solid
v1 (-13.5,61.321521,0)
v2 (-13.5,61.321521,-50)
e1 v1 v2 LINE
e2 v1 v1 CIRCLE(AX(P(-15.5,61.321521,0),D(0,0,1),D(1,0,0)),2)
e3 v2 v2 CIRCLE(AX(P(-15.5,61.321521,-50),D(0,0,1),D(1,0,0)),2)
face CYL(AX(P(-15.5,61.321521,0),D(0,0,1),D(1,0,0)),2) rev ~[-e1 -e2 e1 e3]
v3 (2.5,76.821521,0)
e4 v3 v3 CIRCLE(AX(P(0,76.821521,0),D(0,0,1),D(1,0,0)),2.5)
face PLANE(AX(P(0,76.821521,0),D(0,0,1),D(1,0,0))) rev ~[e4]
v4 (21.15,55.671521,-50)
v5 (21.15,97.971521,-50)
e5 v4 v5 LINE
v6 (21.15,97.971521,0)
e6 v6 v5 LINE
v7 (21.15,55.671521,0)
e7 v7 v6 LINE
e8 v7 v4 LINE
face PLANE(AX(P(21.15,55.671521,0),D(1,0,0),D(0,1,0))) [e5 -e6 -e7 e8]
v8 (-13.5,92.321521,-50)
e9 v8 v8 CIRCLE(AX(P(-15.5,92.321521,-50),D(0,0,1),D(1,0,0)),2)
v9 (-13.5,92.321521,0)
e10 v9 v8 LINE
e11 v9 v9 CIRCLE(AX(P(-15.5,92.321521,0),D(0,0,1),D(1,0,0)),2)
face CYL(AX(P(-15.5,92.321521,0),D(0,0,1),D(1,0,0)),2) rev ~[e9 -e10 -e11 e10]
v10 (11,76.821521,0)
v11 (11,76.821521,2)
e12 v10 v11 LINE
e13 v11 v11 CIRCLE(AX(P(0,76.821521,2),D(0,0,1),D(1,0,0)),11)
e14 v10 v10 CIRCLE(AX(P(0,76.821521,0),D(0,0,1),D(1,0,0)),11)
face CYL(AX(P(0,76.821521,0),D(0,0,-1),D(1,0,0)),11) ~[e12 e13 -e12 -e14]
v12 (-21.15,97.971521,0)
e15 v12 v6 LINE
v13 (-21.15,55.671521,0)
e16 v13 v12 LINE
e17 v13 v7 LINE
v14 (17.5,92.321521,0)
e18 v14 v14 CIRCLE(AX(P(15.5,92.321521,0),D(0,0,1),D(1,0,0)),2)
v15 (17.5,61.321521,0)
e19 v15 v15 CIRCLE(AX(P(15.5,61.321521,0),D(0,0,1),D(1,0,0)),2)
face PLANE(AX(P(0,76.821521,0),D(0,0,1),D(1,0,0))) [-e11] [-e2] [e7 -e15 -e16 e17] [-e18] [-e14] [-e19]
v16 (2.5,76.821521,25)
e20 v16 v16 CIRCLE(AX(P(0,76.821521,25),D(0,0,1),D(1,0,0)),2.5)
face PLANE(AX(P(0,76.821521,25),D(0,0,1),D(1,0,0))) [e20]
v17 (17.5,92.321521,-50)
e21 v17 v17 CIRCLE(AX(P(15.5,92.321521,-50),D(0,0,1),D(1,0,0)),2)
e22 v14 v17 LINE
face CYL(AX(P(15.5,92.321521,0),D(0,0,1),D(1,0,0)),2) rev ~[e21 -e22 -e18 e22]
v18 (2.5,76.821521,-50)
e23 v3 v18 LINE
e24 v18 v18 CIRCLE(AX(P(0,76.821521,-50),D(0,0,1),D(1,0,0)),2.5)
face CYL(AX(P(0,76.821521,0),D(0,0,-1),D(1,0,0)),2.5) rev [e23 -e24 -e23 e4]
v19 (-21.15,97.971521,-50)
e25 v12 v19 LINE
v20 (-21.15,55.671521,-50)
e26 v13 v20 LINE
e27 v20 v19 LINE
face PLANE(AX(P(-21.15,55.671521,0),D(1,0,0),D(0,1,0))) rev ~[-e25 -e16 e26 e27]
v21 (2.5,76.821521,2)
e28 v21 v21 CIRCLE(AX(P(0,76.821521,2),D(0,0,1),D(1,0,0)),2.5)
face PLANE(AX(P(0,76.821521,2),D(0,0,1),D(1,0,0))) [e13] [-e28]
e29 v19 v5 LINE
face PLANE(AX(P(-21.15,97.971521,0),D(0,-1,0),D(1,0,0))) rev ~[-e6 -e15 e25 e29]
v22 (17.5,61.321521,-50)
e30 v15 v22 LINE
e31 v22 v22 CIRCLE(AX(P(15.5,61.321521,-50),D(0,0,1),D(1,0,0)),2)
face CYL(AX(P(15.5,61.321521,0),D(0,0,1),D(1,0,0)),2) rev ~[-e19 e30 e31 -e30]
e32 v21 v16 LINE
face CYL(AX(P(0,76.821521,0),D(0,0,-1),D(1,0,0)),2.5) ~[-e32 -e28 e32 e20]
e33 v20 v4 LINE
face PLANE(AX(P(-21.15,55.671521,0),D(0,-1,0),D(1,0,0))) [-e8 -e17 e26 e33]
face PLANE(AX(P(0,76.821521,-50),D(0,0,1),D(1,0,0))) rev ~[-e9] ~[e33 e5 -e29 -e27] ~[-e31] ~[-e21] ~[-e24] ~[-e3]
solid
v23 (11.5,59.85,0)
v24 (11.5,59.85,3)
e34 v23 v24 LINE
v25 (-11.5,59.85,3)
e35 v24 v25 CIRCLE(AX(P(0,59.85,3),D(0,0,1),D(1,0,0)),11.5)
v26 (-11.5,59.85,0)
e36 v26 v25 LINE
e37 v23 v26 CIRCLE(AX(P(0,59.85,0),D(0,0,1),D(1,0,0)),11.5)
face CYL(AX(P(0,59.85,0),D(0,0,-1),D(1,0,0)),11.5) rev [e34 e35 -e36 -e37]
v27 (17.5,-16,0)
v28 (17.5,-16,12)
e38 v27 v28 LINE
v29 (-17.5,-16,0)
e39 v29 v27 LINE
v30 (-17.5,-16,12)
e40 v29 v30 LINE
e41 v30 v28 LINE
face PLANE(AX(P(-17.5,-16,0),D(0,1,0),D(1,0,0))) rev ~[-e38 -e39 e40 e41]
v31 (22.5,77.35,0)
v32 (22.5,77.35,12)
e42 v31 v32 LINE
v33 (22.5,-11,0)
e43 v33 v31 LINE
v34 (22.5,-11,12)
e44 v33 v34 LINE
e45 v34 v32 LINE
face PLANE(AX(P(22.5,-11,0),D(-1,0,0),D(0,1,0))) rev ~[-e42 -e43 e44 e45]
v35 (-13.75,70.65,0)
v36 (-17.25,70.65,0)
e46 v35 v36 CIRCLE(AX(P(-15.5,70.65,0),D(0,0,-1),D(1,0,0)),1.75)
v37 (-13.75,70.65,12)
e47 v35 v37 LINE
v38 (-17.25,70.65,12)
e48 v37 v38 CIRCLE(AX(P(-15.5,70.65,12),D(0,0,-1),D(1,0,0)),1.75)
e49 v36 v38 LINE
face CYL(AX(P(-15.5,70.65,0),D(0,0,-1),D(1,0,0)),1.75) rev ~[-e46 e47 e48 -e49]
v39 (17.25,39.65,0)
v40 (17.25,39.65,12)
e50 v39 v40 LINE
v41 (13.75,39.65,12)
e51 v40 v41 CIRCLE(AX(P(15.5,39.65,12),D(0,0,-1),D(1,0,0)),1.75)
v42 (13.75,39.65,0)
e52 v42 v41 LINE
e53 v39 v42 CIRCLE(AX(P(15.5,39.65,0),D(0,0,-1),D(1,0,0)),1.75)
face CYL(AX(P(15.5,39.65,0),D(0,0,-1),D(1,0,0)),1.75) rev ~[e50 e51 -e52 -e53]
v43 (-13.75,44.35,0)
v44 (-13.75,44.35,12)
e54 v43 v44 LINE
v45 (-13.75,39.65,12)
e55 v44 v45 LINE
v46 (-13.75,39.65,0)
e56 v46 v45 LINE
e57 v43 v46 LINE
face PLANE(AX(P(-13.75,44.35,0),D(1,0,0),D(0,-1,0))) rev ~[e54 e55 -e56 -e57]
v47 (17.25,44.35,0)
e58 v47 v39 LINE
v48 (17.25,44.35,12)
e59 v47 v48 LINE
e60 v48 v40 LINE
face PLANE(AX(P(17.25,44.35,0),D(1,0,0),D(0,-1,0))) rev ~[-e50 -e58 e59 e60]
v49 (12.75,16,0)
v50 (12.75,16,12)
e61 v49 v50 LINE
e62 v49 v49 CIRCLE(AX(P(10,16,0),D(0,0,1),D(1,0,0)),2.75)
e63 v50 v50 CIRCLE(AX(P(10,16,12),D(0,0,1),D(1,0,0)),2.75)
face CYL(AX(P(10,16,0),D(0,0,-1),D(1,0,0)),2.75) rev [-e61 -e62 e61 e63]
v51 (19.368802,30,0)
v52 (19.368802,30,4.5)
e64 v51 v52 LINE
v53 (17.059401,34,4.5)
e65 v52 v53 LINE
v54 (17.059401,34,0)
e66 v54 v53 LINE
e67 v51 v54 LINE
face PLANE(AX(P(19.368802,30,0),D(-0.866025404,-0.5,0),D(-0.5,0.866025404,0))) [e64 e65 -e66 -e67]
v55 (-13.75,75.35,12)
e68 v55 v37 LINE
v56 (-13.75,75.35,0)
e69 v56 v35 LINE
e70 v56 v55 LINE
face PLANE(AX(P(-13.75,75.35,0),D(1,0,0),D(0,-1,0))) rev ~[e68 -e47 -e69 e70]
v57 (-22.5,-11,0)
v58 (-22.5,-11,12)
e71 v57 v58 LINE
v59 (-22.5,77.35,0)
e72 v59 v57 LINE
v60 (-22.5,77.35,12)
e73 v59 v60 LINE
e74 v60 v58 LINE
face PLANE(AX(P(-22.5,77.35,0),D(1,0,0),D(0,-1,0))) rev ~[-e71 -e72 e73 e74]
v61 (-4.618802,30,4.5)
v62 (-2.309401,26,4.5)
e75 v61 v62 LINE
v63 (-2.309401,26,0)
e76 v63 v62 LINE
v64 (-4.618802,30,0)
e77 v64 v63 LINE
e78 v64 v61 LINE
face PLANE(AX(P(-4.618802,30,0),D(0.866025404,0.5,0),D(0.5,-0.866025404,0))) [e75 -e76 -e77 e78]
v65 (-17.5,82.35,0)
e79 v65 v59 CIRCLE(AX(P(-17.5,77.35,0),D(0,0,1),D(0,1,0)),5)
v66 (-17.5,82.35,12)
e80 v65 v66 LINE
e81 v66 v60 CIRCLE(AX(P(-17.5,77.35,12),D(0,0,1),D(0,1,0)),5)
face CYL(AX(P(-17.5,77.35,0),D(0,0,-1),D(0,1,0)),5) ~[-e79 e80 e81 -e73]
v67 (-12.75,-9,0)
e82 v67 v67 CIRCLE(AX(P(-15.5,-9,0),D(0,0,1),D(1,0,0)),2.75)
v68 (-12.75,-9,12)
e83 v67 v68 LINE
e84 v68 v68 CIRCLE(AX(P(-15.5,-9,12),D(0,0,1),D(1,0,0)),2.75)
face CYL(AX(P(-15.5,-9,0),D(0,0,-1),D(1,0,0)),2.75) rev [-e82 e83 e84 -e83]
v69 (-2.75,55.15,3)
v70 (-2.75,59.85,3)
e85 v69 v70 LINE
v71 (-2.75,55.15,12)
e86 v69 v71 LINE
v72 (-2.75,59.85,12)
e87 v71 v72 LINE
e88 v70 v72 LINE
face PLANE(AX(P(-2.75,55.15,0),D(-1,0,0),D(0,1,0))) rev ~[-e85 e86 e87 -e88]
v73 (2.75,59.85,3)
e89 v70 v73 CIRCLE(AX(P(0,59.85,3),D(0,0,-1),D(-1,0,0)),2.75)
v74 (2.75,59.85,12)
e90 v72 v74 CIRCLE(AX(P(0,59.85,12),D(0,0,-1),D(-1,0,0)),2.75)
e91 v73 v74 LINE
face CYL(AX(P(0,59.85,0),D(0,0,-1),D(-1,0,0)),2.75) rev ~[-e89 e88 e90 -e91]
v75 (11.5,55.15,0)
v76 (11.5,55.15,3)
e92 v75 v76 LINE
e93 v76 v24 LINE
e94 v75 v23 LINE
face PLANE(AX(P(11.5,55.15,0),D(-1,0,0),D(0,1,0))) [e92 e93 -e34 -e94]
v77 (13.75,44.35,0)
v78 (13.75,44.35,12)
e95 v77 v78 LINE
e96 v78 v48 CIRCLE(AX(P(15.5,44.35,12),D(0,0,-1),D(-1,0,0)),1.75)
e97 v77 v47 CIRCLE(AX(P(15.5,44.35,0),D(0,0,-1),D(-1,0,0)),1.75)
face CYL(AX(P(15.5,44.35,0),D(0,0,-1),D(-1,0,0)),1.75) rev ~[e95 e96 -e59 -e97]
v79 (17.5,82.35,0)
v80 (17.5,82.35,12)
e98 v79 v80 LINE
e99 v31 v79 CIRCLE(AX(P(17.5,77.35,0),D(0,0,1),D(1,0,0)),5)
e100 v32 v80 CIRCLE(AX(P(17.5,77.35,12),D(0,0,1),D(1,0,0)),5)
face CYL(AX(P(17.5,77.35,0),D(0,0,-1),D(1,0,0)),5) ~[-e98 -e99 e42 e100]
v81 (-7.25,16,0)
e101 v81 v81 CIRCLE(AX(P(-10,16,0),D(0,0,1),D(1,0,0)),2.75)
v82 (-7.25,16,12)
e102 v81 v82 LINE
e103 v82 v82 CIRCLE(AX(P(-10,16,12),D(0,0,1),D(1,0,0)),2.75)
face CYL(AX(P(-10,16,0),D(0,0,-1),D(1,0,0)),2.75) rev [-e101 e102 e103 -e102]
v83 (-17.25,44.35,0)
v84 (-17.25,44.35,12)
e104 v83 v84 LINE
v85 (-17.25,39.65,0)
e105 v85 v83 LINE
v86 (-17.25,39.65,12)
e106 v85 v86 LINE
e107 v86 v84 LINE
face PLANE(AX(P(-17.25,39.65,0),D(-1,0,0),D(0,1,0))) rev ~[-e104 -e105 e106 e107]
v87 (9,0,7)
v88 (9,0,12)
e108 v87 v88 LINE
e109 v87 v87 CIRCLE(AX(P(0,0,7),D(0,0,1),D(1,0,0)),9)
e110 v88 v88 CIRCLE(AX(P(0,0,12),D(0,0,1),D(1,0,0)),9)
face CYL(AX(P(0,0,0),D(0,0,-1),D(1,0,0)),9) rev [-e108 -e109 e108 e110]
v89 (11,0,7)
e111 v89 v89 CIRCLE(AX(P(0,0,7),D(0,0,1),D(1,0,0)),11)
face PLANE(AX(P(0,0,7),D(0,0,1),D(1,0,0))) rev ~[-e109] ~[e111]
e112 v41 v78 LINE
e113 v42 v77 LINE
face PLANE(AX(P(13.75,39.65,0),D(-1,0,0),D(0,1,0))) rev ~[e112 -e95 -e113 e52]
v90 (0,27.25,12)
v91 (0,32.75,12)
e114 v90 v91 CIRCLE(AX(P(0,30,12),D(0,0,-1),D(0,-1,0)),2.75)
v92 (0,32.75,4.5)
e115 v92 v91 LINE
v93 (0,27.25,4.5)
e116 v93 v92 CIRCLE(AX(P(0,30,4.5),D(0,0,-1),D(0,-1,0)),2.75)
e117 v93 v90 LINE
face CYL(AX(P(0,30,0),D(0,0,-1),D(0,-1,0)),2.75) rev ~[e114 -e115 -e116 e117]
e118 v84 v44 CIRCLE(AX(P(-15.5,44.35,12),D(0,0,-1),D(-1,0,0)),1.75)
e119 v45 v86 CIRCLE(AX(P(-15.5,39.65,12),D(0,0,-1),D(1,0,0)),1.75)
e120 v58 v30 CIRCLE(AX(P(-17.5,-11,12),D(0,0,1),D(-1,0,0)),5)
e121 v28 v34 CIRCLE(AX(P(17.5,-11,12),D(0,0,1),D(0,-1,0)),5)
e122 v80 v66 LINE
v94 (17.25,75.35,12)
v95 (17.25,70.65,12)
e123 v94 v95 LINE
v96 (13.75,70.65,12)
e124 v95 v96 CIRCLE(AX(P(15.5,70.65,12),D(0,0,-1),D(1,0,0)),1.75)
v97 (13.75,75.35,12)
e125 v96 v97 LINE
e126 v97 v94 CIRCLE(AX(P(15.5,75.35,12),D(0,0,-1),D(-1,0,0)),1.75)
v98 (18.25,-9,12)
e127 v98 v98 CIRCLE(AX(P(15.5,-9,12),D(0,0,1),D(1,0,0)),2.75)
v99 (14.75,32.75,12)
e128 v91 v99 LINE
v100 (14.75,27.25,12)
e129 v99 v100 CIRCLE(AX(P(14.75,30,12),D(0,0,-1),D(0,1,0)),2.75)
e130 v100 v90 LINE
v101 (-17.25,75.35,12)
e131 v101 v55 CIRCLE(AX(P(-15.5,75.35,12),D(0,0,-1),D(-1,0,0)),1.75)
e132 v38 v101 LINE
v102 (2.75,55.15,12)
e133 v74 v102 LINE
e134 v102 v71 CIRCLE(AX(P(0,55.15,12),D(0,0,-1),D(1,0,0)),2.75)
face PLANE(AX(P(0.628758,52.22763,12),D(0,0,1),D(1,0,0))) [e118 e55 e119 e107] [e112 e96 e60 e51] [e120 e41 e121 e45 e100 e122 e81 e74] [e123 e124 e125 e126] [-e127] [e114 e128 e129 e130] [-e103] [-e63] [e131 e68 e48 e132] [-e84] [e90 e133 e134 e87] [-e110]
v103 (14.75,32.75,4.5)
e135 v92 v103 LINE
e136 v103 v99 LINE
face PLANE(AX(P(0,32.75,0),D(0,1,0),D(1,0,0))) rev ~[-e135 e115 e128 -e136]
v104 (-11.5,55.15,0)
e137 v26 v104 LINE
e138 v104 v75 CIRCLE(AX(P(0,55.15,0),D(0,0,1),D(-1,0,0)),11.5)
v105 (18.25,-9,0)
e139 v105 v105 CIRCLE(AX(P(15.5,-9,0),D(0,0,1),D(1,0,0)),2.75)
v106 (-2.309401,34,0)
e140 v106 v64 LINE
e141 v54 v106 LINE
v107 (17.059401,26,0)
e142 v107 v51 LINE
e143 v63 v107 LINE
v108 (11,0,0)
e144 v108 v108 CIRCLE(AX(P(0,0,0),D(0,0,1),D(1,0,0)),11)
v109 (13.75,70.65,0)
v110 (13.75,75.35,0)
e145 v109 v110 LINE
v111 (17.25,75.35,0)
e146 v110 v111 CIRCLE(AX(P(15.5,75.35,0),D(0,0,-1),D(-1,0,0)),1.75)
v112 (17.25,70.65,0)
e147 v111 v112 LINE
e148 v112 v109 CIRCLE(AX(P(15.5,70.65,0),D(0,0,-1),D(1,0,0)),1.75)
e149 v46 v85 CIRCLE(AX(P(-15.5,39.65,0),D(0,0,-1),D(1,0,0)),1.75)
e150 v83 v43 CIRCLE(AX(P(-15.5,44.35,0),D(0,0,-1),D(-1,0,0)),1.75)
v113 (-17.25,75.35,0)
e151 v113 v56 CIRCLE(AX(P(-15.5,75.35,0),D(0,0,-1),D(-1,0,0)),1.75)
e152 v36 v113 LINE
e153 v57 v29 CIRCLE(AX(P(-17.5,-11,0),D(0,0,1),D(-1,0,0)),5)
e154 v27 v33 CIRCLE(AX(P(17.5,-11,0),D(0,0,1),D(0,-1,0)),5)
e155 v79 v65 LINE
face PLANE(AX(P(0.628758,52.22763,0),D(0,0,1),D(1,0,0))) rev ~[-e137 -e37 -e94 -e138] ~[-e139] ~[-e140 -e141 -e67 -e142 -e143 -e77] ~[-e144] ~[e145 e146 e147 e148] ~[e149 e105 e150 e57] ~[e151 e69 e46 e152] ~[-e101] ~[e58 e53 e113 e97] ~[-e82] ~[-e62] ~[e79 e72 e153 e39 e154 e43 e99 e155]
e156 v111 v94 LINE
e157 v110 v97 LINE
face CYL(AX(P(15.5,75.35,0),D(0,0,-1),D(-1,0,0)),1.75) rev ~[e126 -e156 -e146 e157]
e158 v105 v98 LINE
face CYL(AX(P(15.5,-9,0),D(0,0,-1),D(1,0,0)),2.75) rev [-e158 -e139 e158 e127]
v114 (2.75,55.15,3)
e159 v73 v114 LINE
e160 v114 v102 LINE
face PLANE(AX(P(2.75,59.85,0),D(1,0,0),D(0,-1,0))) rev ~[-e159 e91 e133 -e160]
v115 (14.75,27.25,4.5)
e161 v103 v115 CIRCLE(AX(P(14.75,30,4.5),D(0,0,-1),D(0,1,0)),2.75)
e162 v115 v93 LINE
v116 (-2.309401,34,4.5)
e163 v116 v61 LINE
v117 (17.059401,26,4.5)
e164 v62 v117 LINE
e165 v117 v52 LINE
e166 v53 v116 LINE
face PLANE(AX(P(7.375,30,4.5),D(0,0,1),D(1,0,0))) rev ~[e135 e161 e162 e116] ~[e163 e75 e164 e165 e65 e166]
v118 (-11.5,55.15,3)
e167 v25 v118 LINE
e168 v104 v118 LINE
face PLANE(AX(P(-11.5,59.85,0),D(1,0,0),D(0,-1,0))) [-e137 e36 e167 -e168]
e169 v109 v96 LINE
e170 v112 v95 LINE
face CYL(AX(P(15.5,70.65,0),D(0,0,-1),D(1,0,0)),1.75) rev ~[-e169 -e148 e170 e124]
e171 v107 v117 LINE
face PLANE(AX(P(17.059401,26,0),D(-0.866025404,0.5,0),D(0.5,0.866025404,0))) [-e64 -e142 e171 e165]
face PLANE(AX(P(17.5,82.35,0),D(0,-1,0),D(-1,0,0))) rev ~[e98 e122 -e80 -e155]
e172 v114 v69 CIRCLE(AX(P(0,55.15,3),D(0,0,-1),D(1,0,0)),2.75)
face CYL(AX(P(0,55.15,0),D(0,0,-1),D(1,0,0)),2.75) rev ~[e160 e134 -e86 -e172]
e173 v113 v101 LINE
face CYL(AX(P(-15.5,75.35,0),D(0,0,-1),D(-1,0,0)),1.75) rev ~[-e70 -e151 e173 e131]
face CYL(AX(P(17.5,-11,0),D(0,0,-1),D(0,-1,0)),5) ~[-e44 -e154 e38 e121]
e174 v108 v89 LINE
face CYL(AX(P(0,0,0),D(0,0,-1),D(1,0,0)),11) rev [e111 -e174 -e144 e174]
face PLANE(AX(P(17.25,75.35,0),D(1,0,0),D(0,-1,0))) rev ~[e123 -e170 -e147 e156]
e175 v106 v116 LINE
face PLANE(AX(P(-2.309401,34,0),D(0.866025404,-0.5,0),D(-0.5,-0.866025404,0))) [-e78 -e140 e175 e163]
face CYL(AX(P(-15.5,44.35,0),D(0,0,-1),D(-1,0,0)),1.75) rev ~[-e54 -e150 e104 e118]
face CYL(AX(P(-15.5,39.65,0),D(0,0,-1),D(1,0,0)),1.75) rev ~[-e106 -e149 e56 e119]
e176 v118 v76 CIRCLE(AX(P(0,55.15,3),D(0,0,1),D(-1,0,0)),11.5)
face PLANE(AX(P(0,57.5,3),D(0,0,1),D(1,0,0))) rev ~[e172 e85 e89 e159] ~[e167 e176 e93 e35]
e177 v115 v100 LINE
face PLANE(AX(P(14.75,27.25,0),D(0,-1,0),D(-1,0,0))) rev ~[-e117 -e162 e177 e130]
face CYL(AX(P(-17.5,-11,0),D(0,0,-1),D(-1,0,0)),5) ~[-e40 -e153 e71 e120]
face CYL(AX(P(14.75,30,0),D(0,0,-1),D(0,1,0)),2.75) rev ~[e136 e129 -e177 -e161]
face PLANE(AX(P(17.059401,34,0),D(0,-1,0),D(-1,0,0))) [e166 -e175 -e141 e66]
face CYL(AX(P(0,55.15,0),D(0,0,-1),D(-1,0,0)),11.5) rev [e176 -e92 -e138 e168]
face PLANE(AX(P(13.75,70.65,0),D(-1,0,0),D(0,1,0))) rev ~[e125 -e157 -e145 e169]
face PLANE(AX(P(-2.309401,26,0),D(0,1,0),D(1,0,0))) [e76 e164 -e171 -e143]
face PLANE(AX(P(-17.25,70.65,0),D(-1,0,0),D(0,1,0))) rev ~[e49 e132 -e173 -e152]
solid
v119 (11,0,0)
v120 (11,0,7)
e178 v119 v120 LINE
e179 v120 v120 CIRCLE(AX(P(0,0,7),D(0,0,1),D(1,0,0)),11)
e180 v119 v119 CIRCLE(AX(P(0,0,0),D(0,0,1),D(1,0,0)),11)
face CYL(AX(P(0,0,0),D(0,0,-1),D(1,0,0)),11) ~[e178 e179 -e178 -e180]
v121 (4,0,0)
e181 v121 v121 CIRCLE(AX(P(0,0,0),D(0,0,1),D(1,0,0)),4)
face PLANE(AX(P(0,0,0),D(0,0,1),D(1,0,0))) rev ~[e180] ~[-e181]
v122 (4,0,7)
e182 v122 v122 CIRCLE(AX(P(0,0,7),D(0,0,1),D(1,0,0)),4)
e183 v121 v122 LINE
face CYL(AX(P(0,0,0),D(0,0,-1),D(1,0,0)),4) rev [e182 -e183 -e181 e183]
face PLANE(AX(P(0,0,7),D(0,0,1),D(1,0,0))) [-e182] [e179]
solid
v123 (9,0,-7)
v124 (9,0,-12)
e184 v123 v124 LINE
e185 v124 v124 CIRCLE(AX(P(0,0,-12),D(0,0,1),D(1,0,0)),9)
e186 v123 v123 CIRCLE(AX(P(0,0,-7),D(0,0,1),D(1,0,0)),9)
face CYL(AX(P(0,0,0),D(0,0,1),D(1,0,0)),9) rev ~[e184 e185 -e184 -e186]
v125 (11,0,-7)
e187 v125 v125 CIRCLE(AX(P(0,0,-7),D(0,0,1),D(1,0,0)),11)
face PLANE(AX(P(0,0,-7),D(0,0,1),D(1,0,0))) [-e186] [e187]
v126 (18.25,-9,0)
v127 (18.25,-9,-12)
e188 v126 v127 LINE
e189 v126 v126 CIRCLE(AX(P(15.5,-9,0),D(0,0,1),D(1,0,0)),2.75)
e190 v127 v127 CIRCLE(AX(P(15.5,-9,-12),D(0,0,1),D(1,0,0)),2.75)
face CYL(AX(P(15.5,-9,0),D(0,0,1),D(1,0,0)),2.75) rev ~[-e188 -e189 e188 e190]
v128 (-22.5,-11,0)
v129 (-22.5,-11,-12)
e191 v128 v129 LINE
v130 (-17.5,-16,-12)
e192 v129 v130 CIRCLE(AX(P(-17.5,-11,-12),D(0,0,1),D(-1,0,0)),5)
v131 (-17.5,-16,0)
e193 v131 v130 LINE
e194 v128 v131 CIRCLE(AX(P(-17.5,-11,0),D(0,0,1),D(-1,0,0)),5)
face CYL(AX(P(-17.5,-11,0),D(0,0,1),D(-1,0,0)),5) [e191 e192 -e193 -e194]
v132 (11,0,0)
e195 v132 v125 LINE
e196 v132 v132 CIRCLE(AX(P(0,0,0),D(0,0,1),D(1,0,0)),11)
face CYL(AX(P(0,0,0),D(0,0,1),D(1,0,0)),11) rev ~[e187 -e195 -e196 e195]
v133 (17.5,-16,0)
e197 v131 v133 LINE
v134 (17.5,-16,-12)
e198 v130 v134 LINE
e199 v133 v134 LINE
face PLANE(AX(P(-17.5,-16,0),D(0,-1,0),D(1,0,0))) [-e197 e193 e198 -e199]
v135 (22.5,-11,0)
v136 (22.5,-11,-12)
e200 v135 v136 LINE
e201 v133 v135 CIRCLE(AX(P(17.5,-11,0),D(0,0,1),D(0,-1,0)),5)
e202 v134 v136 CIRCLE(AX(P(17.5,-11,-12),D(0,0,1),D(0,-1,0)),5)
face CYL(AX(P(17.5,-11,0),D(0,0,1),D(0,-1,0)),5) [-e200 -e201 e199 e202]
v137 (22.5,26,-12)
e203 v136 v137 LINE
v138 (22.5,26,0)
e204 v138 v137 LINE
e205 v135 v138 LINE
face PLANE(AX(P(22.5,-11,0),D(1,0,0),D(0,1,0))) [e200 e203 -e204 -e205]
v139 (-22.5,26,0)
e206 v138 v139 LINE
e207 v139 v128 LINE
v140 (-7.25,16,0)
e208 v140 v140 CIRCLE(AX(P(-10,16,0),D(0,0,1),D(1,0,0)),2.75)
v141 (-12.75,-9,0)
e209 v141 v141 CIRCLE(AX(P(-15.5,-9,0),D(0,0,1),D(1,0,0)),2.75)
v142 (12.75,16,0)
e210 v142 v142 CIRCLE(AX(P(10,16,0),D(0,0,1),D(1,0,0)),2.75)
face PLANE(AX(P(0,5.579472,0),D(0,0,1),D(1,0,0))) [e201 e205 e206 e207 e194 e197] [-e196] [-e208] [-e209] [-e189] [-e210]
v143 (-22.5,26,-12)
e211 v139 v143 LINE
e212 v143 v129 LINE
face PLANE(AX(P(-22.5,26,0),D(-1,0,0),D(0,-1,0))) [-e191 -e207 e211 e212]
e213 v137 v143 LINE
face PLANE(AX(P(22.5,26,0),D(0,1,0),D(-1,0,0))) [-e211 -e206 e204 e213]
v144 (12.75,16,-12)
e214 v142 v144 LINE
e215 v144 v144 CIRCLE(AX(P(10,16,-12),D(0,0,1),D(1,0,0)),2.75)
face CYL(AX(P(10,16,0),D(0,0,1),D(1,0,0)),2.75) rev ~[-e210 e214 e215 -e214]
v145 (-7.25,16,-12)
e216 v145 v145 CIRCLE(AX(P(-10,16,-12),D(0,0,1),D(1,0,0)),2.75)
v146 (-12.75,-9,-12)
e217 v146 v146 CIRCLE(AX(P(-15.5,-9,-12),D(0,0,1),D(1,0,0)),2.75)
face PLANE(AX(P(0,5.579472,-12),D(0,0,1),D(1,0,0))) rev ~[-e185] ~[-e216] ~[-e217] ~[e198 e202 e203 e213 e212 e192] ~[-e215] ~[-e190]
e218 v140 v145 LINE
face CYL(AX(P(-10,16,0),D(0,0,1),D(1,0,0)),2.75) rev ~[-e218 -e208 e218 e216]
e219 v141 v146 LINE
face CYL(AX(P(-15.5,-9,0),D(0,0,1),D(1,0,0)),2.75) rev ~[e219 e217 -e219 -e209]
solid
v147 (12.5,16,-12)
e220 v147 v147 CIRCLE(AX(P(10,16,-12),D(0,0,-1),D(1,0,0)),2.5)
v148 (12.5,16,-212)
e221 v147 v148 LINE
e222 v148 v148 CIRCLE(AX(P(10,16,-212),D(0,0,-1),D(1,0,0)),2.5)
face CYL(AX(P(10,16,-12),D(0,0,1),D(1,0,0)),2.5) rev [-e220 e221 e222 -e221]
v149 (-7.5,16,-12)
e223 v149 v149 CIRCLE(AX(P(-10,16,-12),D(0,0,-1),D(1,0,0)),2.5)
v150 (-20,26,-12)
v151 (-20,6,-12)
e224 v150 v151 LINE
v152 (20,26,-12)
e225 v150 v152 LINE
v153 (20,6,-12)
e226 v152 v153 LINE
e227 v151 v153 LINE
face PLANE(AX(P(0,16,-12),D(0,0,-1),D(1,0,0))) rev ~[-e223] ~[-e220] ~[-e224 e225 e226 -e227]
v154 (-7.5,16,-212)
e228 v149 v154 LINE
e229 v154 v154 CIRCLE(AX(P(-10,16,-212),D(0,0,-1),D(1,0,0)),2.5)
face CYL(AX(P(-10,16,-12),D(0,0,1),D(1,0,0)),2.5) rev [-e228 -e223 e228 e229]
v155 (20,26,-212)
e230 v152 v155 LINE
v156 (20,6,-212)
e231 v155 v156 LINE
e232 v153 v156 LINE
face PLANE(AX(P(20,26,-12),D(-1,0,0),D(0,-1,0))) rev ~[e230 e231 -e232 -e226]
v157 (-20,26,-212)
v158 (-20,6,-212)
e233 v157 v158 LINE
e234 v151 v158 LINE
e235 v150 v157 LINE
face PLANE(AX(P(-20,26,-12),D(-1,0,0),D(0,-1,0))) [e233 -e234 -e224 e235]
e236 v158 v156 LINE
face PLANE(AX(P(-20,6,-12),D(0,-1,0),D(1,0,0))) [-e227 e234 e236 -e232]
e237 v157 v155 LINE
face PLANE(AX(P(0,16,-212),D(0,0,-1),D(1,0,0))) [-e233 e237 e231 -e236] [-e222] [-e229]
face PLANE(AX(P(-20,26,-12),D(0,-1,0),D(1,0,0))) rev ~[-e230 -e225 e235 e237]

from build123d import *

# Parameters (mm, degrees)
F1_R      = 11
F1_R_2    = 4
F2_DEPTH  = 7
F0_W      = 42.3
F0_H      = 42.3
F0_R      = 2
F0_R_2    = 11
F0_R_3    = 2.5
F3_DEPTH  = 50
F4_DEPTH  = 2
F5_DEPTH  = 25
F6_R      = 2.75
F6_R_2    = 11
F6_R_3    = 9
F7_DEPTH  = 12
F8_DEPTH  = 7
F9_DEPTH  = 3
F10_DEPTH = 12
F11_DEPTH = 7
F12_W     = 40
F12_H     = 20
F12_R     = 2.5
F13_DEPTH = 200
F14_DEPTH = 4.5


with BuildPart() as f2:
    # F1 (on Top) → F2 (new body)
    with BuildSketch(Plane.XY):
        Circle(F1_R)
        Circle(F1_R_2, mode=Mode.SUBTRACT)
    extrude(amount=F2_DEPTH)


with BuildPart() as f3:
    # F0 (on Top) → F3 (new body)
    with BuildSketch(Plane.XY):
        with Locations((0, 76.8215209246)):
            Rectangle(F0_W, F0_H)
        with Locations((-15.5, 61.3215209246)):
            Circle(F0_R, mode=Mode.SUBTRACT)
        with Locations((15.5, 61.3215209246)):
            Circle(F0_R, mode=Mode.SUBTRACT)
        with Locations((-15.5, 92.3215209246)):
            Circle(F0_R, mode=Mode.SUBTRACT)
        with Locations((0, 76.8215209246)):
            Circle(F0_R_2, mode=Mode.SUBTRACT)
        with Locations((15.5, 92.3215209246)):
            Circle(F0_R, mode=Mode.SUBTRACT)
        with Locations((0, 76.8215209246)):
            Circle(F0_R_2)
        with Locations((0, 76.8215209246)):
            Circle(F0_R_3, mode=Mode.SUBTRACT)
    extrude(amount=-F3_DEPTH)

    # F0 (on Top) → F4 (join)
    with BuildSketch(Plane.XY):
        with Locations((0, 76.8215209246)):
            Circle(F0_R_2)
        with Locations((0, 76.8215209246)):
            Circle(F0_R_3, mode=Mode.SUBTRACT)
    extrude(amount=F4_DEPTH)

    # F0 (on Top) → F5 (join)
    with BuildSketch(Plane.XY):
        with Locations((0, 76.8215209246)):
            Circle(F0_R_3)
    extrude(amount=F5_DEPTH)


with BuildPart() as f7:
    # F6 (on Top) → F7 (new body)
    with BuildSketch(Plane.XY):
        with BuildLine():
            Line((17.0594010768, 26), (22.5, 26))
            Line((22.5, 26), (22.5, 77.35))
            ThreePointArc((22.5, 77.35), (21.0355339059, 80.8855339059), (17.5, 82.35))
            Line((17.5, 82.35), (-17.5, 82.35))
            ThreePointArc((-17.5, 82.35), (-21.0355339059, 80.8855339059), (-22.5, 77.35))
            Line((-22.5, 77.35), (-22.5, 26))
            Line((-22.5, 26), (-2.3094010768, 26))
            Line((-2.3094010768, 26), (-4.6188021535, 30))
            Line((-4.6188021535, 30), (-2.3094010768, 34))
            Line((-2.3094010768, 34), (17.0594010768, 34))
            Line((17.0594010768, 34), (19.3688021535, 30))
            Line((19.3688021535, 30), (17.0594010768, 26))
        make_face()
        with BuildLine():
            Line((-17.25, 39.65), (-17.25, 44.35))
            ThreePointArc((-17.25, 44.35), (-15.5, 46.1), (-13.75, 44.35))
            Line((-13.75, 44.35), (-13.75, 39.65))
            ThreePointArc((-13.75, 39.65), (-15.5, 37.9), (-17.25, 39.65))
        make_face(mode=Mode.SUBTRACT)
        with BuildLine():
            Line((-17.25, 70.65), (-17.25, 75.35))
            ThreePointArc((-17.25, 75.35), (-15.5, 77.1), (-13.75, 75.35))
            Line((-13.75, 75.35), (-13.75, 70.65))
            ThreePointArc((-13.75, 70.65), (-15.5, 68.9), (-17.25, 70.65))
        make_face(mode=Mode.SUBTRACT)
        with BuildLine():
            ThreePointArc((11.5, 55.15), (0, 43.65), (-11.5, 55.15))
            Line((-11.5, 55.15), (-11.5, 59.85))
            ThreePointArc((-11.5, 59.85), (0, 71.35), (11.5, 59.85))
            Line((11.5, 59.85), (11.5, 55.15))
        make_face(mode=Mode.SUBTRACT)
        with BuildLine():
            Line((13.75, 39.65), (13.75, 44.35))
            ThreePointArc((13.75, 44.35), (15.5, 46.1), (17.25, 44.35))
            Line((17.25, 44.35), (17.25, 39.65))
            ThreePointArc((17.25, 39.65), (15.5, 37.9), (13.75, 39.65))
        make_face(mode=Mode.SUBTRACT)
        with BuildLine():
            Line((13.75, 70.65), (13.75, 75.35))
            ThreePointArc((13.75, 75.35), (15.5, 77.1), (17.25, 75.35))
            Line((17.25, 75.35), (17.25, 70.65))
            ThreePointArc((17.25, 70.65), (15.5, 68.9), (13.75, 70.65))
        make_face(mode=Mode.SUBTRACT)
        with BuildLine():
            Line((-17.5, -16), (0, -16))
            Line((0, -16), (17.5, -16))
            ThreePointArc((17.5, -16), (21.0355339059, -14.5355339059), (22.5, -11))
            Line((22.5, -11), (22.5, 26))
            Line((22.5, 26), (17.0594010768, 26))
            Line((17.0594010768, 26), (-2.3094010768, 26))
            Line((-2.3094010768, 26), (-22.5, 26))
            Line((-22.5, 26), (-22.5, -11))
            ThreePointArc((-22.5, -11), (-21.0355339059, -14.5355339059), (-17.5, -16))
        make_face()
        with Locations((-15.5, -9)):
            Circle(F6_R, mode=Mode.SUBTRACT)
        with Locations((-10, 16)):
            Circle(F6_R, mode=Mode.SUBTRACT)
        Circle(F6_R_2, mode=Mode.SUBTRACT)
        with Locations((15.5, -9)):
            Circle(F6_R, mode=Mode.SUBTRACT)
        with Locations((10, 16)):
            Circle(F6_R, mode=Mode.SUBTRACT)
        with BuildLine():
            Line((-11.5, 59.85), (-11.5, 55.15))
            ThreePointArc((-11.5, 55.15), (0, 43.65), (11.5, 55.15))
            Line((11.5, 55.15), (11.5, 59.85))
            ThreePointArc((11.5, 59.85), (0, 71.35), (-11.5, 59.85))
        make_face()
        with BuildLine():
            Line((-2.75, 55.15), (-2.75, 59.85))
            ThreePointArc((-2.75, 59.85), (0, 62.6), (2.75, 59.85))
            Line((2.75, 59.85), (2.75, 55.15))
            ThreePointArc((2.75, 55.15), (0, 52.4), (-2.75, 55.15))
        make_face(mode=Mode.SUBTRACT)
        Circle(F6_R_2)
        Circle(F6_R_3, mode=Mode.SUBTRACT)
        Polygon((-2.3094010768, 26), (17.0594010768, 26), (19.3688021535, 30), (17.0594010768, 34), (-2.3094010768, 34), (-4.6188021535, 30), align=None)
        with BuildLine():
            Line((14.75, 27.25), (0, 27.25))
            ThreePointArc((0, 27.25), (-2.75, 30), (0, 32.75))
            Line((0, 32.75), (14.75, 32.75))
            ThreePointArc((14.75, 32.75), (17.5, 30), (14.75, 27.25))
        make_face(mode=Mode.SUBTRACT)
    extrude(amount=F7_DEPTH)

    # F6 (on Top) → F8 (cut)
    with BuildSketch(Plane.XY):
        Circle(F6_R_2)
        Circle(F6_R_3, mode=Mode.SUBTRACT)
    extrude(amount=F8_DEPTH, mode=Mode.SUBTRACT)

    # F6 (on Top) → F9 (cut)
    with BuildSketch(Plane.XY):
        with BuildLine():
            Line((-11.5, 59.85), (-11.5, 55.15))
            ThreePointArc((-11.5, 55.15), (0, 43.65), (11.5, 55.15))
            Line((11.5, 55.15), (11.5, 59.85))
            ThreePointArc((11.5, 59.85), (0, 71.35), (-11.5, 59.85))
        make_face()
        with BuildLine():
            Line((-2.75, 55.15), (-2.75, 59.85))
            ThreePointArc((-2.75, 59.85), (0, 62.6), (2.75, 59.85))
            Line((2.75, 59.85), (2.75, 55.15))
            ThreePointArc((2.75, 55.15), (0, 52.4), (-2.75, 55.15))
        make_face(mode=Mode.SUBTRACT)
    extrude(amount=F9_DEPTH, mode=Mode.SUBTRACT)

    # F6 (on Top) → F14 (cut)
    with BuildSketch(Plane.XY):
        Polygon((-2.3094010768, 26), (17.0594010768, 26), (19.3688021535, 30), (17.0594010768, 34), (-2.3094010768, 34), (-4.6188021535, 30), align=None)
        with BuildLine():
            Line((14.75, 27.25), (0, 27.25))
            ThreePointArc((0, 27.25), (-2.75, 30), (0, 32.75))
            Line((0, 32.75), (14.75, 32.75))
            ThreePointArc((14.75, 32.75), (17.5, 30), (14.75, 27.25))
        make_face(mode=Mode.SUBTRACT)
    extrude(amount=F14_DEPTH, mode=Mode.SUBTRACT)


with BuildPart() as f10:
    # F6 (on Top) → F10 (new body)
    with BuildSketch(Plane.XY):
        with BuildLine():
            Line((-17.5, -16), (0, -16))
            Line((0, -16), (17.5, -16))
            ThreePointArc((17.5, -16), (21.0355339059, -14.5355339059), (22.5, -11))
            Line((22.5, -11), (22.5, 26))
            Line((22.5, 26), (17.0594010768, 26))
            Line((17.0594010768, 26), (-2.3094010768, 26))
            Line((-2.3094010768, 26), (-22.5, 26))
            Line((-22.5, 26), (-22.5, -11))
            ThreePointArc((-22.5, -11), (-21.0355339059, -14.5355339059), (-17.5, -16))
        make_face()
        with Locations((-15.5, -9)):
            Circle(F6_R, mode=Mode.SUBTRACT)
        with Locations((-10, 16)):
            Circle(F6_R, mode=Mode.SUBTRACT)
        Circle(F6_R_2, mode=Mode.SUBTRACT)
        with Locations((15.5, -9)):
            Circle(F6_R, mode=Mode.SUBTRACT)
        with Locations((10, 16)):
            Circle(F6_R, mode=Mode.SUBTRACT)
        Circle(F6_R_2)
        Circle(F6_R_3, mode=Mode.SUBTRACT)
    extrude(amount=-F10_DEPTH)

    # F6 (on Top) → F11 (cut)
    with BuildSketch(Plane.XY):
        Circle(F6_R_2)
        Circle(F6_R_3, mode=Mode.SUBTRACT)
    extrude(amount=-F11_DEPTH, mode=Mode.SUBTRACT)


with BuildPart() as f13:
    # F12 (on face) → F13 (new body)
    with BuildSketch(Plane(origin=(0, 0, -12), x_dir=(1, 0, 0), z_dir=(0, 0, -1))):
        with Locations((0, -16)):
            Rectangle(F12_W, F12_H)
        with Locations((-10, -16)):
            Circle(F12_R, mode=Mode.SUBTRACT)
        with Locations((10, -16)):
            Circle(F12_R, mode=Mode.SUBTRACT)
    extrude(amount=F13_DEPTH)


solid = Compound([f2.part, f3.part, f7.part, f10.part, f13.part])
